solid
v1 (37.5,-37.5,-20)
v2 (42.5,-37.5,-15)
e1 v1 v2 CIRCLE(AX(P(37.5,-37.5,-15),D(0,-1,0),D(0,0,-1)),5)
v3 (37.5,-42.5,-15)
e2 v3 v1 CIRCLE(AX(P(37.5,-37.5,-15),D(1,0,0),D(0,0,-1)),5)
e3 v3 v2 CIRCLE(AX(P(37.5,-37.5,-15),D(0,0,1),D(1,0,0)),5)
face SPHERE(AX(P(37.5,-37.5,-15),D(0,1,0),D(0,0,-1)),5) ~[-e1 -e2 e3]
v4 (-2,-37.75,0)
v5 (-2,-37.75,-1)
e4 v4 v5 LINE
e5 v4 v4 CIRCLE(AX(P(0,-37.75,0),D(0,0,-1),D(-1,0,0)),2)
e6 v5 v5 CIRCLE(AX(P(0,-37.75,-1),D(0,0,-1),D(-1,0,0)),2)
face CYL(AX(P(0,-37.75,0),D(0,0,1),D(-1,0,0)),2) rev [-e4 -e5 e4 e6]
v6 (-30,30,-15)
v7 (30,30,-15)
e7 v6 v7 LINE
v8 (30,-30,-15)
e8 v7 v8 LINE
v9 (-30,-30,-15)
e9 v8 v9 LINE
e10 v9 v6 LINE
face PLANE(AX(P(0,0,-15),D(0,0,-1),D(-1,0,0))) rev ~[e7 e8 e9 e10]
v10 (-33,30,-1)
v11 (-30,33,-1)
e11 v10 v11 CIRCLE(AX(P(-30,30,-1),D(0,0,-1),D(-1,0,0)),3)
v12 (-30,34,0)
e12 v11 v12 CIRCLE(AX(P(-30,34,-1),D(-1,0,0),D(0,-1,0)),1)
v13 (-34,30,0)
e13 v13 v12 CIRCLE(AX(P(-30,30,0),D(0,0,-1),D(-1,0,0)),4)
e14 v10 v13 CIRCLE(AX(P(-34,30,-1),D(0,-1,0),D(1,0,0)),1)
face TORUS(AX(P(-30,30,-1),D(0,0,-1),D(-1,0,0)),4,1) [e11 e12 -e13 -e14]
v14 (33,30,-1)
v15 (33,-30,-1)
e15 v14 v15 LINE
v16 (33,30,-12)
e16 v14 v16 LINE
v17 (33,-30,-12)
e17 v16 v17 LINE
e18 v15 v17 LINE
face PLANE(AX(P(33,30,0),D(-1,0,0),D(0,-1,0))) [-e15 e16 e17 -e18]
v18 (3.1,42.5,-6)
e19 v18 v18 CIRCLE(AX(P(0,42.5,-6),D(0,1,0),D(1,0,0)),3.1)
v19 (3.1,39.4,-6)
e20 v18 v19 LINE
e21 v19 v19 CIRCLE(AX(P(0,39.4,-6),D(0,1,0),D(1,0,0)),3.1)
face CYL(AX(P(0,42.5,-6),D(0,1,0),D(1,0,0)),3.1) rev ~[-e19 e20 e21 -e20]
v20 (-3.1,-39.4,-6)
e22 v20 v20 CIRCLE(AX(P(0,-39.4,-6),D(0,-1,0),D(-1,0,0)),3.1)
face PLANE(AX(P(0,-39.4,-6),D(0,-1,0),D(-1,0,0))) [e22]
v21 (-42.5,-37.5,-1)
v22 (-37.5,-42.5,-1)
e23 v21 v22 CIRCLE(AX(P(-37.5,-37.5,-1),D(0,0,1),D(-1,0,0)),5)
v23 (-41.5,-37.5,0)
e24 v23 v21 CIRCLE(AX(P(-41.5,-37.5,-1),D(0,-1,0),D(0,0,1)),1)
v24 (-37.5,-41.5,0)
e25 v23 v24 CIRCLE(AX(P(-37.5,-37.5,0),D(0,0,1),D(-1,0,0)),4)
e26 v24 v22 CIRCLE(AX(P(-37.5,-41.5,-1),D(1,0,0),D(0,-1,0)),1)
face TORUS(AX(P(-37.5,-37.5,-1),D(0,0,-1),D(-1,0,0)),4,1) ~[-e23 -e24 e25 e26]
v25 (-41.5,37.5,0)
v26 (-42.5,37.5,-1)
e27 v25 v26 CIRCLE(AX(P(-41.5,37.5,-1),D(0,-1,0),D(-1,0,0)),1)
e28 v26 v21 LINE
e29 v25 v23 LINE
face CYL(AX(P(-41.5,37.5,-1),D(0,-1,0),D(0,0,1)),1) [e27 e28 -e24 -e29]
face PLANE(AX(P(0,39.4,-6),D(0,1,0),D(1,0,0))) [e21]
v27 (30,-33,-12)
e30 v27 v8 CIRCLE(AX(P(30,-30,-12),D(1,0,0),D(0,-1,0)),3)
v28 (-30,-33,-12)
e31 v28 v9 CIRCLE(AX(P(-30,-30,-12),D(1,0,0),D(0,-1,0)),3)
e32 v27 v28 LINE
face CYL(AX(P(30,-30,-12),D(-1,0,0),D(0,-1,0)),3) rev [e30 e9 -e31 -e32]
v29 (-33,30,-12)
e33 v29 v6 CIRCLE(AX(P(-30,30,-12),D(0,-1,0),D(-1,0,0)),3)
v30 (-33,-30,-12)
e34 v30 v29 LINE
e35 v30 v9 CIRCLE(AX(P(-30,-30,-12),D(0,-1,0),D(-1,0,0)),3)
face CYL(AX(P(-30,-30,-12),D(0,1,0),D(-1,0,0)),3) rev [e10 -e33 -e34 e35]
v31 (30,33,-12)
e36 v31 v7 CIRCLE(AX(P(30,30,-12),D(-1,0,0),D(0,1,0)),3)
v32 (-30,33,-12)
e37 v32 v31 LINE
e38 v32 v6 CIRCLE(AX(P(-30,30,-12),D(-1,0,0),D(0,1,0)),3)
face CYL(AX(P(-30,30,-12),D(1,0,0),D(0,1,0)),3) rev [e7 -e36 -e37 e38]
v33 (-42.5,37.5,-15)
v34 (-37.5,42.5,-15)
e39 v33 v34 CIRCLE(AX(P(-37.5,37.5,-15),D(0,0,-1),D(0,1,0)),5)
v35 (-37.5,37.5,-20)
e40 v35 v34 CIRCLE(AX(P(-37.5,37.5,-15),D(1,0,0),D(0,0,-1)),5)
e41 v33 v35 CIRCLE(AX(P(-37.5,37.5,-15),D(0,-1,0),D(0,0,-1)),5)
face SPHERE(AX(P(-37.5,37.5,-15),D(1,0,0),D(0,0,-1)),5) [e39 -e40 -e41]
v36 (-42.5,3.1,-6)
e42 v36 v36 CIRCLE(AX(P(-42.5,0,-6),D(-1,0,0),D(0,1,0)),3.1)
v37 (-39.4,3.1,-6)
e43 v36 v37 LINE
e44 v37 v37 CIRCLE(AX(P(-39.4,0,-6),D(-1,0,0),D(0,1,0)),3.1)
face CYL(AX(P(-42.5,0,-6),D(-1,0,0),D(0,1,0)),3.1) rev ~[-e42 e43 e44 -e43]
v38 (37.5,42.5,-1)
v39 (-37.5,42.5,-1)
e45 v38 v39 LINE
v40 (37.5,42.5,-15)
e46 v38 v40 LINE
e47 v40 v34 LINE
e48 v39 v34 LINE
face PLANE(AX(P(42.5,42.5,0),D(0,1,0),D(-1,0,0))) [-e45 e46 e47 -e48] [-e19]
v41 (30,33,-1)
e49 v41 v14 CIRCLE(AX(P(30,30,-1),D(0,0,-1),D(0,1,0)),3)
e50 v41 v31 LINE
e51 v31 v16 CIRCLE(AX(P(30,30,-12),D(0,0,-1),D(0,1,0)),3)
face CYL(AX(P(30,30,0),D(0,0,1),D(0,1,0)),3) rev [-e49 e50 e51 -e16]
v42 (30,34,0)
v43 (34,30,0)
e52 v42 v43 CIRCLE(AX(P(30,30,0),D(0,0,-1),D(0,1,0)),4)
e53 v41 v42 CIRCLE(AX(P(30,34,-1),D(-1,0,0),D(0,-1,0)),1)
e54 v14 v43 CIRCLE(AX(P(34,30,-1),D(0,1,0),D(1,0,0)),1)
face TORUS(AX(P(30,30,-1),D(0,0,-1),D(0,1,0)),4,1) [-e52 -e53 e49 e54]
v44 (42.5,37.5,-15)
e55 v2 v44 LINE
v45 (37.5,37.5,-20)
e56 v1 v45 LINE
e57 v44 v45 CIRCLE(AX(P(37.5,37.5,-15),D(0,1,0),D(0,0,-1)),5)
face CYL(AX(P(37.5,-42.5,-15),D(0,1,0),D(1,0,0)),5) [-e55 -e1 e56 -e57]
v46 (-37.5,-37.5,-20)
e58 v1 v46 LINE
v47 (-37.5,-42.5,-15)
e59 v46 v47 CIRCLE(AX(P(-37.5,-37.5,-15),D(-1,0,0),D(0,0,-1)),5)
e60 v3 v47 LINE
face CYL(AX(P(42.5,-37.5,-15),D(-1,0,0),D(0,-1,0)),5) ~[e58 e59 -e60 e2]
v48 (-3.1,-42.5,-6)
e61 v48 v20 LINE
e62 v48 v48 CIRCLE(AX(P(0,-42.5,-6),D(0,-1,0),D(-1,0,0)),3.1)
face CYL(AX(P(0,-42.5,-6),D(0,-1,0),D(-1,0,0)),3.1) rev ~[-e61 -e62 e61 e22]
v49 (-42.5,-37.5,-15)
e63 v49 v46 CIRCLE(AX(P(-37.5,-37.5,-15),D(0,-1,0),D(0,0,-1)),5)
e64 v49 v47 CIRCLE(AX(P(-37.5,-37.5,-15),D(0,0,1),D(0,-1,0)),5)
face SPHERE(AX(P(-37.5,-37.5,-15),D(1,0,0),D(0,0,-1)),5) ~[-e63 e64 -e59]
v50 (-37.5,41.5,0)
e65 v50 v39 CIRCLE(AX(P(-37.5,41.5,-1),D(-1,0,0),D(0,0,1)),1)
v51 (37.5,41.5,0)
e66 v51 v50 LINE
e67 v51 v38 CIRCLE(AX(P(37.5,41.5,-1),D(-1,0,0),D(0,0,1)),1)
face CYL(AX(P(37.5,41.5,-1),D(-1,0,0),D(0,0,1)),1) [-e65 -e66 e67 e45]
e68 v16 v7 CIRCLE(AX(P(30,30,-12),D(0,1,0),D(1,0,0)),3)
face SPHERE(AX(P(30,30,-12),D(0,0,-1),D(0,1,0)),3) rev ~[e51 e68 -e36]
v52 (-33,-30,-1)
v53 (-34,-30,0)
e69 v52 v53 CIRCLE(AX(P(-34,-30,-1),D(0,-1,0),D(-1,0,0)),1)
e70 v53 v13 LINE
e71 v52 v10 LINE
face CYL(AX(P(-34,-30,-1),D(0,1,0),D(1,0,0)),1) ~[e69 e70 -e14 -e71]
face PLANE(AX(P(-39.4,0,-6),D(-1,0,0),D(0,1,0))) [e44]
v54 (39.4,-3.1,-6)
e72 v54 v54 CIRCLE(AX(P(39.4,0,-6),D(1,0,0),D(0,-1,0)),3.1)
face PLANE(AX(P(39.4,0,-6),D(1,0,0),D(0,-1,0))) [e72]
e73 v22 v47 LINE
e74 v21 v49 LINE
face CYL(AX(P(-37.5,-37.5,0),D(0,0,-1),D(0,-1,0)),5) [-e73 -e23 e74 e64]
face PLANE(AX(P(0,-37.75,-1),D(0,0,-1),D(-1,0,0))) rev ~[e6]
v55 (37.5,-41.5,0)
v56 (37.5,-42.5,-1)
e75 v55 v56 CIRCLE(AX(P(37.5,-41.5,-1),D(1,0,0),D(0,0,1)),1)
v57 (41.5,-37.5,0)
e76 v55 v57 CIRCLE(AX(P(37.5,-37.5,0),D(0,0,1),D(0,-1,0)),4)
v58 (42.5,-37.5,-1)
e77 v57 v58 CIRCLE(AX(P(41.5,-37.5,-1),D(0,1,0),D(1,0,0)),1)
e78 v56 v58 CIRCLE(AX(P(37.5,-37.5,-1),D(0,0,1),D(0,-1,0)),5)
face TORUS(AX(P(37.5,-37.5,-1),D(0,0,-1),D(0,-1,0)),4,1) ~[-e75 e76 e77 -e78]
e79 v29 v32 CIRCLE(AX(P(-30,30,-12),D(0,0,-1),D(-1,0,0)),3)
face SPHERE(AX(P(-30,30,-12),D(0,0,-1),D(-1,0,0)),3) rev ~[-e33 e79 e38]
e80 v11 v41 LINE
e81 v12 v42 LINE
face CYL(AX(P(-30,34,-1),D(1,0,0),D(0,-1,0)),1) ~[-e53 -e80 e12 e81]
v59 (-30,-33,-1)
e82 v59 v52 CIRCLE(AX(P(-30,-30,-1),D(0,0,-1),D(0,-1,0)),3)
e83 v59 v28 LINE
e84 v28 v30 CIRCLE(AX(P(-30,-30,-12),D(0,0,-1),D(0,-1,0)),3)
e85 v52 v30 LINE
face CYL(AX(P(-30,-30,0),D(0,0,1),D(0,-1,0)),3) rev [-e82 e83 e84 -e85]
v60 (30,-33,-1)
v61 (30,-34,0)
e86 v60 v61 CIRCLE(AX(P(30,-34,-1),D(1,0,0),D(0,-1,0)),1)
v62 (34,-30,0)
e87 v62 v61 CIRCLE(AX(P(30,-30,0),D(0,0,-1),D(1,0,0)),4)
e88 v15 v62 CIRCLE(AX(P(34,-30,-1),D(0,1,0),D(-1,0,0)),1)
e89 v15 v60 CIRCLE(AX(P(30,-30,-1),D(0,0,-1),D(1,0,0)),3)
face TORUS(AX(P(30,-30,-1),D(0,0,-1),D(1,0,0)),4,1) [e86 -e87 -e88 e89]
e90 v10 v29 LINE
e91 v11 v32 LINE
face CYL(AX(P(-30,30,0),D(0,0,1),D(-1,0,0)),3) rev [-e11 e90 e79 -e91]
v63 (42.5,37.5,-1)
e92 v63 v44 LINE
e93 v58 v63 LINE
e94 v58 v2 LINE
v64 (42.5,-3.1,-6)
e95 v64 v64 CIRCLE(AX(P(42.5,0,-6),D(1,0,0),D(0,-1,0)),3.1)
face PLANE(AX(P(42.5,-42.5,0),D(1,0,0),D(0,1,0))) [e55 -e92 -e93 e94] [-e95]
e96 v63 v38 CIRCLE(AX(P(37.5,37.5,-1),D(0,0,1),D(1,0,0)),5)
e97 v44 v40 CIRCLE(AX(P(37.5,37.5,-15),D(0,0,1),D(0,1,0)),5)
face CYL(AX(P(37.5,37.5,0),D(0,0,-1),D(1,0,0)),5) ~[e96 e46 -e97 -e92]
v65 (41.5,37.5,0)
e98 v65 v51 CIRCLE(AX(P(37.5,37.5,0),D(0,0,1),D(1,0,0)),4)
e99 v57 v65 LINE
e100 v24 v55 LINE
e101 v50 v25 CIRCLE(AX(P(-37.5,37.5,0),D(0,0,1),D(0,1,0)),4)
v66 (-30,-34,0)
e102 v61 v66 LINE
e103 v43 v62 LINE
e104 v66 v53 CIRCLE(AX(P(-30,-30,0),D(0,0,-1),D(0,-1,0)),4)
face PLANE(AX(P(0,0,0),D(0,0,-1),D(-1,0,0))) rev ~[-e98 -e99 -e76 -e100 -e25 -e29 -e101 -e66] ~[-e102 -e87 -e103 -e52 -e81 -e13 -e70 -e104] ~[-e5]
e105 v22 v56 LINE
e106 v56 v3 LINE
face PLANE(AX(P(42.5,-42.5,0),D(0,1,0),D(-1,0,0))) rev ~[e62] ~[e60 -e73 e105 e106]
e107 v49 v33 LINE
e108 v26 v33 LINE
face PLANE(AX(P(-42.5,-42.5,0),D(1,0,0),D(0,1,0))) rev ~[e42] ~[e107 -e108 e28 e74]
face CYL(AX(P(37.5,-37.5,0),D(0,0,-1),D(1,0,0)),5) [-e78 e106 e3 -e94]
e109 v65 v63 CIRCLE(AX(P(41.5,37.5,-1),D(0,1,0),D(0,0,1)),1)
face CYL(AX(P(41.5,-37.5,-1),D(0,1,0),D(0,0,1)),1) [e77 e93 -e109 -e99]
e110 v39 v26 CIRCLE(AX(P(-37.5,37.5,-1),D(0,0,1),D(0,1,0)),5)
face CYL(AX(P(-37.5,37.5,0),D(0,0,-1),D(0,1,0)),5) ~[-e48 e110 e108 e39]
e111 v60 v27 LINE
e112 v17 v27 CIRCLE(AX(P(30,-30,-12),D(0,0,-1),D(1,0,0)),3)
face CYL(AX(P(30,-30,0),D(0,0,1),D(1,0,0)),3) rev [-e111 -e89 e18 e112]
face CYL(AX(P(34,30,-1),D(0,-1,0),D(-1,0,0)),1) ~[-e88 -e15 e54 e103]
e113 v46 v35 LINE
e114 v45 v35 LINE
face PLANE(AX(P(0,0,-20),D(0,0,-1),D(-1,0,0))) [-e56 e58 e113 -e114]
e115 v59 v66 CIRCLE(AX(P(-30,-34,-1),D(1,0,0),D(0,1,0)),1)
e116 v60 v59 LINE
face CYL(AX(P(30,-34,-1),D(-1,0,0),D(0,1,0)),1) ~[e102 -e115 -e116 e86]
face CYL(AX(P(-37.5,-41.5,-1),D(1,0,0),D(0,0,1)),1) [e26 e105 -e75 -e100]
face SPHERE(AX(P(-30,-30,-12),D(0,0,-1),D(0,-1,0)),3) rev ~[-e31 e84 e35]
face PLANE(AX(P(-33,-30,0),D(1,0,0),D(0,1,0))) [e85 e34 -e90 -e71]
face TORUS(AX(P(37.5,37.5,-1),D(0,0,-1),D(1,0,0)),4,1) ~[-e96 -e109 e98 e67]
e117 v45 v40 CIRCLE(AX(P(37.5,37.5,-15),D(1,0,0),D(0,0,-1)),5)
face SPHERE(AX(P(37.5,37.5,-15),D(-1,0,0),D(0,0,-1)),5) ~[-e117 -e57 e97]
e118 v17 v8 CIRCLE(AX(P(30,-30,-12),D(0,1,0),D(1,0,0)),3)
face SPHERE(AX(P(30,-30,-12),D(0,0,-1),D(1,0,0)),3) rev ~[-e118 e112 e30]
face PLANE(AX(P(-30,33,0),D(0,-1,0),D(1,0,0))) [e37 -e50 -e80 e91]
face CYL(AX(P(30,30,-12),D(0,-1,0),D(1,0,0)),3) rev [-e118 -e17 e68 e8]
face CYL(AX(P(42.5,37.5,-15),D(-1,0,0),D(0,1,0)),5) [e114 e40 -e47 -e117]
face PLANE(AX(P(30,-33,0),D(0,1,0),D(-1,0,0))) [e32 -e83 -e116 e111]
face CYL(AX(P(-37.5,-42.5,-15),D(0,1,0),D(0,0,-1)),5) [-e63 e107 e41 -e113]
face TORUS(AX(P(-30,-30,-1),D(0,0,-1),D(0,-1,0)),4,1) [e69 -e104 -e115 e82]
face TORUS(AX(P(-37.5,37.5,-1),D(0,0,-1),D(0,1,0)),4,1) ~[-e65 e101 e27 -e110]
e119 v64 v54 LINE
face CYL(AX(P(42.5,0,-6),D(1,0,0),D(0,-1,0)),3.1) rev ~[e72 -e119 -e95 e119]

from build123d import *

# Parameters (mm, degrees)
F0_W      = 85
F0_H      = 85
F0_R      = 2
F1_DEPTH  = 20
F2_DEPTH  = 15
F3_R      = 5
F4_R      = 3
F5_R      = 1
F6_R      = 3.1
F7_DEPTH  = 3.1
F8_R      = 3.1
F9_DEPTH  = 3.1
F10_R     = 3.1
F11_DEPTH = 3.1
F12_R     = 3.1
F13_DEPTH = 3.1
F14_DEPTH = 1
F15_ANGLE = 180


# Not quite as in the source:
# - a feature names something its author has since deleted; it is built from what else it names


with BuildPart() as f1:
    # F0 (on Top) → F1 (new body)
    with BuildSketch(Plane.XY):
        Rectangle(F0_W, F0_H)
        with Locations((0, -37.75)):
            Circle(F0_R, mode=Mode.SUBTRACT)
        with BuildLine():
            ThreePointArc((-33, 30), (-32.1213203436, 32.1213203436), (-30, 33))
            Line((-30, 33), (30, 33))
            ThreePointArc((30, 33), (32.1213203436, 32.1213203436), (33, 30))
            Line((33, 30), (33, -30))
            ThreePointArc((33, -30), (32.1213203436, -32.1213203436), (30, -33))
            Line((30, -33), (-30, -33))
            ThreePointArc((-30, -33), (-32.1213203436, -32.1213203436), (-33, -30))
            Line((-33, -30), (-33, 30))
        make_face(mode=Mode.SUBTRACT)
        with BuildLine():
            Line((30, 33), (-30, 33))
            ThreePointArc((-30, 33), (-32.1213203436, 32.1213203436), (-33, 30))
            Line((-33, 30), (-33, -30))
            ThreePointArc((-33, -30), (-32.1213203436, -32.1213203436), (-30, -33))
            Line((-30, -33), (30, -33))
            ThreePointArc((30, -33), (32.1213203436, -32.1213203436), (33, -30))
            Line((33, -30), (33, 30))
            ThreePointArc((33, 30), (32.1213203436, 32.1213203436), (30, 33))
        make_face()
        with Locations((0, -37.75)):
            Circle(F0_R)
    extrude(amount=F1_DEPTH)

    # F0 (on Top) → F2 (cut)
    with BuildSketch(Plane.XY):
        with BuildLine():
            Line((30, 33), (-30, 33))
            ThreePointArc((-30, 33), (-32.1213203436, 32.1213203436), (-33, 30))
            Line((-33, 30), (-33, -30))
            ThreePointArc((-33, -30), (-32.1213203436, -32.1213203436), (-30, -33))
            Line((-30, -33), (30, -33))
            ThreePointArc((30, -33), (32.1213203436, -32.1213203436), (33, -30))
            Line((33, -30), (33, 30))
            ThreePointArc((33, 30), (32.1213203436, 32.1213203436), (30, 33))
        make_face()
    extrude(amount=F2_DEPTH, mode=Mode.SUBTRACT)

    # F3
    f3_edges = [f1.edges().sort_by_distance(p)[0] for p in [
        (0, 42.5, 20),
        (-42.5, 0, 20),
        (0, -42.5, 20),
        (42.5, 0, 20),
        (42.5, 42.5, 10),
        (-42.5, 42.5, 10),
        (-42.5, -42.5, 10),
        (42.5, -42.5, 10),
    ]]
    fillet(f3_edges, radius=F3_R)

    # F4
    f4_edges = [f1.edges().sort_by_distance(p)[0] for p in [
        (0, 33, 15),
        (-32.12132, 32.12132, 15),
        (-33, 0, 15),
        (-32.12132, -32.12132, 15),
        (0, -33, 15),
        (32.12132, -32.12132, 15),
        (33, 0, 15),
        (32.12132, 32.12132, 15),
    ]]
    fillet(f4_edges, radius=F4_R)

    # F5
    f5_edges = [f1.edges().sort_by_distance(p)[0] for p in [
        (0, 42.5, 0),
        (41.035534, 41.035534, 0),
        (-41.035534, 41.035534, 0),
        (42.5, 0, 0),
        (-42.5, 0, 0),
        (41.035534, -41.035534, 0),
        (-41.035534, -41.035534, 0),
        (0, -42.5, 0),
        (0, 33, 0),
        (-32.12132, 32.12132, 0),
        (-33, 0, 0),
        (-32.12132, -32.12132, 0),
        (0, -33, 0),
        (32.12132, -32.12132, 0),
        (33, 0, 0),
        (32.12132, 32.12132, 0),
    ]]
    fillet(f5_edges, radius=F5_R)

    # F6 (on face) → F7 (cut)
    with BuildSketch(Plane.XZ.offset(42.5)):
        with Locations((0, 6)):
            Circle(F6_R)
    extrude(amount=-F7_DEPTH, mode=Mode.SUBTRACT)

    # F8 (on face) → F9 (cut)
    with BuildSketch(Plane(origin=(0, 42.5, 0), x_dir=(-1, 0, 0), z_dir=(0, 1, 0))):
        with Locations((0, 6)):
            Circle(F8_R)
    extrude(amount=-F9_DEPTH, mode=Mode.SUBTRACT)

    # F10 (on face) → F11 (cut)
    with BuildSketch(Plane(origin=(-42.5, 0, 0), x_dir=(0, -1, 0), z_dir=(-1, 0, 0))):
        with Locations((0, 6)):
            Circle(F10_R)
    extrude(amount=-F11_DEPTH, mode=Mode.SUBTRACT)

    # F12 (on face) → F13 (cut)
    with BuildSketch(Plane.YZ.offset(42.5)):
        with Locations((0, 6)):
            Circle(F12_R)
    extrude(amount=-F13_DEPTH, mode=Mode.SUBTRACT)

    # F0 (on Top) → F14 (cut)
    with BuildSketch(Plane.XY):
        with Locations((0, -37.75)):
            Circle(F0_R)
    extrude(amount=F14_DEPTH, mode=Mode.SUBTRACT)


with BuildPart() as f1_1:
    # F15: moved
    add(f1.part.rotate(Axis((0, 0, 0), (0, 1, 0)), F15_ANGLE))


solid = f1_1.part
